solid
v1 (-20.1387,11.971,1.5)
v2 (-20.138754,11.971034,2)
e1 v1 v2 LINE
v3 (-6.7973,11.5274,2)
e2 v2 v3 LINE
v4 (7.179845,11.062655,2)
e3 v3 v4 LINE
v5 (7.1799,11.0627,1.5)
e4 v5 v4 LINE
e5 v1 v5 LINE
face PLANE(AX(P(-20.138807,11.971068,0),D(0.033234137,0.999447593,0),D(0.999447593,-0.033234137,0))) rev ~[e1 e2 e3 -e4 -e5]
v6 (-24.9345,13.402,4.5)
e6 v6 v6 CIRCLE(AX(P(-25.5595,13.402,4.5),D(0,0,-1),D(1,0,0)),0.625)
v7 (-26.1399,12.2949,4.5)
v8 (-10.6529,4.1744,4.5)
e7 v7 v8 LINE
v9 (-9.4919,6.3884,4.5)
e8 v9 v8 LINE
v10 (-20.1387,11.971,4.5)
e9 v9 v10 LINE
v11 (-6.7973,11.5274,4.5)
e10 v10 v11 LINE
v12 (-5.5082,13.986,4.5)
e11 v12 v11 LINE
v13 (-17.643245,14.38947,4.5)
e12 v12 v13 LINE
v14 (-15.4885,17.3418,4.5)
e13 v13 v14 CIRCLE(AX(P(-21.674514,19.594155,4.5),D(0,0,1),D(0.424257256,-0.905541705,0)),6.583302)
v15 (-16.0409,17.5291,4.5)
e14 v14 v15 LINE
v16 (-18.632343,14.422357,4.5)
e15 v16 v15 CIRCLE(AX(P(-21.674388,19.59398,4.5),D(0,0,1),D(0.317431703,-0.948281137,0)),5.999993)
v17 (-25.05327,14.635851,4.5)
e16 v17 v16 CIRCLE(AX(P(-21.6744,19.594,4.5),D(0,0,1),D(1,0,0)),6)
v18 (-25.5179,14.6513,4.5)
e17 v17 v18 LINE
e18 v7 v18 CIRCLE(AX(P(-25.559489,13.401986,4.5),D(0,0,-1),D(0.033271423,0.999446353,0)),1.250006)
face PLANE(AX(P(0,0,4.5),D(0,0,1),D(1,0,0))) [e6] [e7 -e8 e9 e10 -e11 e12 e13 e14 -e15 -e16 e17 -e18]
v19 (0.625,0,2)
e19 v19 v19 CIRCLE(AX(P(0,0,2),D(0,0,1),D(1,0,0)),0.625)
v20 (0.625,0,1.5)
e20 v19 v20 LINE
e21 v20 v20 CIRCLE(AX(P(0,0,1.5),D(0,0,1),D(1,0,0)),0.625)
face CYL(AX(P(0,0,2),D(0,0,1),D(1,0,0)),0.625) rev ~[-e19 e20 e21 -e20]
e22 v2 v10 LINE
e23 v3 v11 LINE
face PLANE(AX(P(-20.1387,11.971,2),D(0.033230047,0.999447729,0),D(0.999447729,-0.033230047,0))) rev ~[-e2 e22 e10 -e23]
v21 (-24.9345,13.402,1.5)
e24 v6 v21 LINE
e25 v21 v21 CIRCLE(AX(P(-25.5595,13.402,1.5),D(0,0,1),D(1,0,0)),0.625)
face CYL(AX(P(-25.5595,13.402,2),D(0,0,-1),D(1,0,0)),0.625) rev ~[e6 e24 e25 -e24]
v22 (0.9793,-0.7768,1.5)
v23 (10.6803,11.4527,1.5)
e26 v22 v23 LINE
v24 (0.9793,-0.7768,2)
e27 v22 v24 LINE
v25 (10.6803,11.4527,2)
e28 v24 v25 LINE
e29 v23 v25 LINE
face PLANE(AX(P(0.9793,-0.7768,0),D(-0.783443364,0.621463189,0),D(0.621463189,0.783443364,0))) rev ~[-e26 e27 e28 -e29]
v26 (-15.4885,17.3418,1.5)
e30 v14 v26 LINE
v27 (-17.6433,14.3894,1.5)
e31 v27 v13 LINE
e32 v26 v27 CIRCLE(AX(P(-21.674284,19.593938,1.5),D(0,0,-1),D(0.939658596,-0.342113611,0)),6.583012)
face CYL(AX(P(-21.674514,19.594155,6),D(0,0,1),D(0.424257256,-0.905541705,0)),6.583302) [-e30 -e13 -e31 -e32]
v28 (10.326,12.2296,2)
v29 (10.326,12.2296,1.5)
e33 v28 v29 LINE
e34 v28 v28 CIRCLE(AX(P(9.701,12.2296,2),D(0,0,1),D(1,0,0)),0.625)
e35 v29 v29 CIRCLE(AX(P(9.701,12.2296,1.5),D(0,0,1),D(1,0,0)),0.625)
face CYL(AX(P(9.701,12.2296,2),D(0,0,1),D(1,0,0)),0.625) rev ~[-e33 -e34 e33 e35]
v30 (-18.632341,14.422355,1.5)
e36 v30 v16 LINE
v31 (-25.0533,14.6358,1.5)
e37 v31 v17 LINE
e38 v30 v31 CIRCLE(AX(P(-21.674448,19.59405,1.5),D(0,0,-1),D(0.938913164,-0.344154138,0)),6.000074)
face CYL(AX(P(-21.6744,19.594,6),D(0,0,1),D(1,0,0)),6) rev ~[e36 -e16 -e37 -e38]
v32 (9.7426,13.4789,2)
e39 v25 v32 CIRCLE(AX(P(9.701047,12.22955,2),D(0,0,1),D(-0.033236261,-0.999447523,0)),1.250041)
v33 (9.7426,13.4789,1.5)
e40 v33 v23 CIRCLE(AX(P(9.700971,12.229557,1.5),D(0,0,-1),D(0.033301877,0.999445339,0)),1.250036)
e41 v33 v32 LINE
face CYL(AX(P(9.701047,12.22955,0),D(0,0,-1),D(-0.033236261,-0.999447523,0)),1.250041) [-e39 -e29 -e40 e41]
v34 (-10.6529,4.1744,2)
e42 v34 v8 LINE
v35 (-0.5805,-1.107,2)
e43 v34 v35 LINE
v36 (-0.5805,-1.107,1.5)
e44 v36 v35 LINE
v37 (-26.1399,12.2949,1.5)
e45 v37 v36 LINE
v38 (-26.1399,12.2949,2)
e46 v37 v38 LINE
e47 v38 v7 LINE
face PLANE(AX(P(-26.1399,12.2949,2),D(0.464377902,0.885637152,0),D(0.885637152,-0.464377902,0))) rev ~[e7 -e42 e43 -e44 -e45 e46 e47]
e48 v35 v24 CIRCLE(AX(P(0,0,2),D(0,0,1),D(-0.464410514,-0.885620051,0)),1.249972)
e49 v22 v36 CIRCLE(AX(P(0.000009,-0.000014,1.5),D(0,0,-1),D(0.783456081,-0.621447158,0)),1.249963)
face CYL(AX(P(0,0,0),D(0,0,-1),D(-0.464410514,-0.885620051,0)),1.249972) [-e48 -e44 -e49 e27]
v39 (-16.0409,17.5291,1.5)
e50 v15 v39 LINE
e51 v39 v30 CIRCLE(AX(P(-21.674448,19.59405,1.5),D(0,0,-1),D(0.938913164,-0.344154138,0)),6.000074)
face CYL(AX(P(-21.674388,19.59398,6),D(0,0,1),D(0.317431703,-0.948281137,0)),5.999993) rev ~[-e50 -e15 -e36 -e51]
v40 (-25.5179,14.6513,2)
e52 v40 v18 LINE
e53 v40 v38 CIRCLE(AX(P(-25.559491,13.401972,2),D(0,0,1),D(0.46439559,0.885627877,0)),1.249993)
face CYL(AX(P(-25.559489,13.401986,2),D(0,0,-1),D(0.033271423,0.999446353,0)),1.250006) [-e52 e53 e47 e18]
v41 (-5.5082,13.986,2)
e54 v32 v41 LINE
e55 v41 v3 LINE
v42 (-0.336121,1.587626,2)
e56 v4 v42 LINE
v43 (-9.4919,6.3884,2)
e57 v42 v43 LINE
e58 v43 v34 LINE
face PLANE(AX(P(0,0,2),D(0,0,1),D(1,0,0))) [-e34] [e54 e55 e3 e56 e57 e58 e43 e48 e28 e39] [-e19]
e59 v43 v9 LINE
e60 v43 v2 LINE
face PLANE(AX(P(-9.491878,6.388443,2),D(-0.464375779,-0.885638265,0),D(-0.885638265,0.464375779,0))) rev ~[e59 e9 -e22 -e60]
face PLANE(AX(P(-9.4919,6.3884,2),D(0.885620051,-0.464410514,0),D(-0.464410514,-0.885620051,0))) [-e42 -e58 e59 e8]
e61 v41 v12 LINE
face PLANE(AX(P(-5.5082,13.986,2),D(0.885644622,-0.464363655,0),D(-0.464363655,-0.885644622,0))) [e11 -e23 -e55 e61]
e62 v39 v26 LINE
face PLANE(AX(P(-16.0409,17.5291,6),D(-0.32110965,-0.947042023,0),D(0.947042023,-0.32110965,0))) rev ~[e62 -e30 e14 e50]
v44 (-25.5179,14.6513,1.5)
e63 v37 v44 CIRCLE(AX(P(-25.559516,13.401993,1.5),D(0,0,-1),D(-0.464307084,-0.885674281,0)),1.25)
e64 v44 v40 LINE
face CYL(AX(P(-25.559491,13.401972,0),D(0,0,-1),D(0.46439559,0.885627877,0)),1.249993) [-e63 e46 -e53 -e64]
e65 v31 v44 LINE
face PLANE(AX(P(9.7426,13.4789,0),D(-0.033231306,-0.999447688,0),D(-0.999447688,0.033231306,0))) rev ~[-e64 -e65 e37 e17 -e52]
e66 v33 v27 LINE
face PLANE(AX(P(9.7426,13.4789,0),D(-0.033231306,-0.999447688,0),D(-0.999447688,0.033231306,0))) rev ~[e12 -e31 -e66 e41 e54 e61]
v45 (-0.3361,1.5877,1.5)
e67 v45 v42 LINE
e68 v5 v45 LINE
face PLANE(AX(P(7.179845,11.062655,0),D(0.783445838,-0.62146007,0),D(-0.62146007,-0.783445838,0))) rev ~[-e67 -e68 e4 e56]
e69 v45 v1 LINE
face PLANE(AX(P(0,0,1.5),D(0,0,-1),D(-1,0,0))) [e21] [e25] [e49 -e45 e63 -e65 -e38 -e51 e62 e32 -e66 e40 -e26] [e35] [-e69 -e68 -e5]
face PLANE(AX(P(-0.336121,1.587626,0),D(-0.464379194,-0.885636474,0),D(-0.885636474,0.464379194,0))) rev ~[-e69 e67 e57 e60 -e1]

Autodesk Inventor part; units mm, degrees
ref_plane "YZ Plane" through (0, 0, 0) normal (1, 0, 0) x (0, 1, 0)
ref_plane "XZ Plane" through (0, 0, 0) normal (0, 1, 0) x (-1, 0, 0)
ref_plane "XY Plane" through (0, 0, 0) normal (0, 0, 1) x (1, 0, 0)
sketch "草圖1" plane through (0, 0, 0) normal (0, 0, 1) x (1, 0, 0)
  line L0 (0, 0) -> (-25.5595, 13.402) construction
  line L1 (-25.5595, 13.402) -> (9.701, 12.2296) construction
  line L2 (9.701, 12.2296) -> (0, 0) construction
  line L3 (-25.5595, 13.402) -> (0, 0) construction
  line L4 (-26.1399, 12.2949) -> (-0.5805, -1.107)
  line L5 (0.5805, 1.107) -> (-24.979, 14.509)
  arc A0 (-24.979, 14.509) -> (-26.1399, 12.2949) centre (-25.5595, 13.402) ccw
  arc A1 (-0.5805, -1.107) -> (0.5805, 1.107) centre (0, 0) ccw
  line L6 (-25.5595, 13.402) -> (9.701, 12.2296) construction
  line L7 (-25.601, 12.1527) -> (9.6595, 10.9802)
  line L8 (9.7426, 13.4789) -> (-25.5179, 14.6513)
  arc A2 (-25.5179, 14.6513) -> (-25.601, 12.1527) centre (-25.5595, 13.402) ccw
  arc A3 (9.6595, 10.9802) -> (9.7426, 13.4789) centre (9.701, 12.2296) ccw
  line L9 (9.701, 12.2296) -> (0, 0) construction
  line L10 (8.7217, 13.0064) -> (-0.9793, 0.7768)
  line L11 (0.9793, -0.7768) -> (10.6803, 11.4527)
  arc A4 (10.6803, 11.4527) -> (8.7217, 13.0064) centre (9.701, 12.2296) ccw
  arc A5 (-0.9793, 0.7768) -> (0.9793, -0.7768) centre (0, 0) ccw
  point P0 (-12.7797, 6.701)
  point P1 (-7.9292, 12.8158)
  point P2 (4.8505, 6.1148)
  dimension "d0" = 28.86
  dimension "d1" = 35.28
  dimension "d2" = 15.61
  dimension "d3" = 2.5
  dimension "d4" = 2.5
  dimension "d5" = 2.5
extrude "擠出1" add sketch "草圖1" along normal blind 2 contours A2 L7 L5 L10 A5 L4 | A0 L5 L7 A2 | A5 L10 L5 A1 | L8 A4 L10 L7 L5 A0 | A1 L5 L10 L7 A3 L11 | A3 L7 L10 A4
sketch "草圖2" plane through (0, 0, 2) normal (0, 0, 1) x (1, 0, 0)
  arc A0 (10.6803, 11.4527) -> (9.7426, 13.4789) centre (9.701, 12.2296) ccw projected
  arc A1 (-25.5179, 14.6513) -> (-26.1399, 12.2949) centre (-25.5595, 13.402) ccw projected
  arc A2 (-0.5805, -1.107) -> (0.9793, -0.7768) centre (0, 0) ccw projected
  circle A3 centre (0, 0) radius 0.625
  circle A4 centre (9.701, 12.2296) radius 0.625
  circle A5 centre (-25.5595, 13.402) radius 0.625
  dimension "d8" = 1.25
  dimension "d9" = 1.25
  dimension "d10" = 1.25
extrude "擠出2" cut sketch "草圖2" against normal blind 2
sketch "草圖4" plane through (0, 0, 2) normal (0, 0, 1) x (1, 0, 0)
  circle A0 centre (-25.5595, 13.402) radius 0.625 projected
  line L0 (-0.3361, 1.5877) -> (-20.1387, 11.971) projected
  line L1 (-20.1387, 11.971) -> (7.1799, 11.0627) projected
  line L2 (9.7426, 13.4789) -> (-25.5179, 14.6513) projected
  arc A1 (-25.5179, 14.6513) -> (-26.1399, 12.2949) centre (-25.5595, 13.402) ccw projected
  line L3 (-26.1399, 12.2949) -> (-0.5805, -1.107) projected
  line L4 (-5.5082, 13.986) -> (-6.7973, 11.5274)
  line L5 (-9.4919, 6.3884) -> (-10.6529, 4.1744)
extrude "擠出3" add sketch "草圖4" along normal blind 4
sketch "草圖5" plane through (0, 0, 6) normal (0, 0, 1) x (1, 0, 0)
  circle A0 centre (-21.6744, 19.594) radius 6
  point P0 (0, 0)
  dimension "d17" = 12
extrude "擠出4" cut sketch "草圖5" against normal blind 40
sketch "草圖7" plane through (0, 0, 6) normal (0, 0, 1) x (1, 0, 0)
  arc A0 (-25.0533, 14.6358) -> (-18.6323, 14.4223) centre (-21.6744, 19.594) ccw projected
  line L0 (-25.0533, 14.6358) -> (-25.5179, 14.6513) projected
  arc A1 (-19.7698, 13.9043) -> (-16.0409, 17.5291) centre (-21.6744, 19.594) ccw
  arc A2 (-18.8815, 13.6327) -> (-15.4885, 17.3418) centre (-21.6744, 19.594) ccw
  line L1 (-16.0409, 17.5291) -> (-15.4885, 17.3418)
  line L2 (-19.7698, 13.9043) -> (-18.8815, 13.6327)
  point P0 (0, 0)
extrude "擠出5" add sketch "草圖7" against normal blind 6
sketch "草圖8" plane through (0, 0, 6) normal (0, 0, 1) x (1, 0, 0)
  line L0 (-36.1611, 22.8385) -> (7.9162, 22.8385)
  line L1 (7.9162, 22.8385) -> (7.9162, -4.1508)
  line L2 (7.9162, -4.1508) -> (-36.1611, -4.1508)
  line L3 (-36.1611, -4.1508) -> (-36.1611, 22.8385)
  point P0 (0, 0)
extrude "擠出6" cut sketch "草圖8" against normal blind 1.5
sketch "草圖9" plane through (0, 0, 0) normal (0, 0, -1) x (-1, 0, 0)
  line L0 (-9.7426, 13.4789) -> (17.6433, 14.3894) projected
  arc A0 (-9.7426, 13.4789) -> (-10.6803, 11.4527) centre (-9.701, 12.2296) ccw projected
  line L1 (-0.9793, -0.7768) -> (-10.6803, 11.4527) projected
  arc A1 (-0.9793, -0.7768) -> (0.5805, -1.107) centre (0, 0) ccw projected
  line L2 (26.1399, 12.2949) -> (0.5805, -1.107) projected
  arc A2 (26.1399, 12.2949) -> (25.5179, 14.6513) centre (25.5595, 13.402) ccw projected
  line L3 (25.0533, 14.6358) -> (25.5179, 14.6513) projected
  arc A3 (16.0409, 17.5291) -> (25.0533, 14.6358) centre (21.6744, 19.594) ccw projected
  line L4 (16.0409, 17.5291) -> (15.4885, 17.3418) projected
  arc A4 (15.4885, 17.3418) -> (17.6433, 14.3894) centre (21.6744, 19.594) ccw projected
  line L5 (-7.1799, 11.0627) -> (0.3361, 1.5877) projected
  line L6 (20.1387, 11.971) -> (-7.1799, 11.0627) projected
  line L7 (0.3361, 1.5877) -> (20.1387, 11.971) projected
  circle A5 centre (25.5595, 13.402) radius 0.625 projected
  circle A6 centre (0, 0) radius 0.625 projected
  circle A7 centre (-9.701, 12.2296) radius 0.625 projected
extrude "擠出7" cut sketch "草圖9" against normal blind 1.5
sketch "草圖6" plane through (0, 0, 2) normal (0, 0, 1) x (1, 0, 0)
  arc A0 (-26.0169, 18.4563) -> (-17.0179, 18.323) centre (-21.5174, 18.3896) ccw
  line L0 (-26.0169, 18.4563) -> (-17.0179, 18.323)
  dimension "d20" = 9
sketch "草圖3" plane through (0, 0, 2) normal (0, 0, 1) x (1, 0, 0)
  line L0 (9.7426, 13.4789) -> (-25.5179, 14.6513) projected
  arc A0 (-25.5179, 14.6513) -> (-26.1399, 12.2949) centre (-25.5595, 13.402) ccw projected
  line L1 (-26.1399, 12.2949) -> (-0.5805, -1.107) projected
  line L2 (-25.5595, 17.902) -> (-25.5595, 8.902)
  arc A1 (-22.3114, 10.2875) -> (-21.1974, 14.5076) centre (-25.5595, 13.402) ccw
  arc A2 (-25.5595, 17.902) -> (-25.5595, 8.902) centre (-25.5595, 13.402) ccw
properties part number "1-1"
